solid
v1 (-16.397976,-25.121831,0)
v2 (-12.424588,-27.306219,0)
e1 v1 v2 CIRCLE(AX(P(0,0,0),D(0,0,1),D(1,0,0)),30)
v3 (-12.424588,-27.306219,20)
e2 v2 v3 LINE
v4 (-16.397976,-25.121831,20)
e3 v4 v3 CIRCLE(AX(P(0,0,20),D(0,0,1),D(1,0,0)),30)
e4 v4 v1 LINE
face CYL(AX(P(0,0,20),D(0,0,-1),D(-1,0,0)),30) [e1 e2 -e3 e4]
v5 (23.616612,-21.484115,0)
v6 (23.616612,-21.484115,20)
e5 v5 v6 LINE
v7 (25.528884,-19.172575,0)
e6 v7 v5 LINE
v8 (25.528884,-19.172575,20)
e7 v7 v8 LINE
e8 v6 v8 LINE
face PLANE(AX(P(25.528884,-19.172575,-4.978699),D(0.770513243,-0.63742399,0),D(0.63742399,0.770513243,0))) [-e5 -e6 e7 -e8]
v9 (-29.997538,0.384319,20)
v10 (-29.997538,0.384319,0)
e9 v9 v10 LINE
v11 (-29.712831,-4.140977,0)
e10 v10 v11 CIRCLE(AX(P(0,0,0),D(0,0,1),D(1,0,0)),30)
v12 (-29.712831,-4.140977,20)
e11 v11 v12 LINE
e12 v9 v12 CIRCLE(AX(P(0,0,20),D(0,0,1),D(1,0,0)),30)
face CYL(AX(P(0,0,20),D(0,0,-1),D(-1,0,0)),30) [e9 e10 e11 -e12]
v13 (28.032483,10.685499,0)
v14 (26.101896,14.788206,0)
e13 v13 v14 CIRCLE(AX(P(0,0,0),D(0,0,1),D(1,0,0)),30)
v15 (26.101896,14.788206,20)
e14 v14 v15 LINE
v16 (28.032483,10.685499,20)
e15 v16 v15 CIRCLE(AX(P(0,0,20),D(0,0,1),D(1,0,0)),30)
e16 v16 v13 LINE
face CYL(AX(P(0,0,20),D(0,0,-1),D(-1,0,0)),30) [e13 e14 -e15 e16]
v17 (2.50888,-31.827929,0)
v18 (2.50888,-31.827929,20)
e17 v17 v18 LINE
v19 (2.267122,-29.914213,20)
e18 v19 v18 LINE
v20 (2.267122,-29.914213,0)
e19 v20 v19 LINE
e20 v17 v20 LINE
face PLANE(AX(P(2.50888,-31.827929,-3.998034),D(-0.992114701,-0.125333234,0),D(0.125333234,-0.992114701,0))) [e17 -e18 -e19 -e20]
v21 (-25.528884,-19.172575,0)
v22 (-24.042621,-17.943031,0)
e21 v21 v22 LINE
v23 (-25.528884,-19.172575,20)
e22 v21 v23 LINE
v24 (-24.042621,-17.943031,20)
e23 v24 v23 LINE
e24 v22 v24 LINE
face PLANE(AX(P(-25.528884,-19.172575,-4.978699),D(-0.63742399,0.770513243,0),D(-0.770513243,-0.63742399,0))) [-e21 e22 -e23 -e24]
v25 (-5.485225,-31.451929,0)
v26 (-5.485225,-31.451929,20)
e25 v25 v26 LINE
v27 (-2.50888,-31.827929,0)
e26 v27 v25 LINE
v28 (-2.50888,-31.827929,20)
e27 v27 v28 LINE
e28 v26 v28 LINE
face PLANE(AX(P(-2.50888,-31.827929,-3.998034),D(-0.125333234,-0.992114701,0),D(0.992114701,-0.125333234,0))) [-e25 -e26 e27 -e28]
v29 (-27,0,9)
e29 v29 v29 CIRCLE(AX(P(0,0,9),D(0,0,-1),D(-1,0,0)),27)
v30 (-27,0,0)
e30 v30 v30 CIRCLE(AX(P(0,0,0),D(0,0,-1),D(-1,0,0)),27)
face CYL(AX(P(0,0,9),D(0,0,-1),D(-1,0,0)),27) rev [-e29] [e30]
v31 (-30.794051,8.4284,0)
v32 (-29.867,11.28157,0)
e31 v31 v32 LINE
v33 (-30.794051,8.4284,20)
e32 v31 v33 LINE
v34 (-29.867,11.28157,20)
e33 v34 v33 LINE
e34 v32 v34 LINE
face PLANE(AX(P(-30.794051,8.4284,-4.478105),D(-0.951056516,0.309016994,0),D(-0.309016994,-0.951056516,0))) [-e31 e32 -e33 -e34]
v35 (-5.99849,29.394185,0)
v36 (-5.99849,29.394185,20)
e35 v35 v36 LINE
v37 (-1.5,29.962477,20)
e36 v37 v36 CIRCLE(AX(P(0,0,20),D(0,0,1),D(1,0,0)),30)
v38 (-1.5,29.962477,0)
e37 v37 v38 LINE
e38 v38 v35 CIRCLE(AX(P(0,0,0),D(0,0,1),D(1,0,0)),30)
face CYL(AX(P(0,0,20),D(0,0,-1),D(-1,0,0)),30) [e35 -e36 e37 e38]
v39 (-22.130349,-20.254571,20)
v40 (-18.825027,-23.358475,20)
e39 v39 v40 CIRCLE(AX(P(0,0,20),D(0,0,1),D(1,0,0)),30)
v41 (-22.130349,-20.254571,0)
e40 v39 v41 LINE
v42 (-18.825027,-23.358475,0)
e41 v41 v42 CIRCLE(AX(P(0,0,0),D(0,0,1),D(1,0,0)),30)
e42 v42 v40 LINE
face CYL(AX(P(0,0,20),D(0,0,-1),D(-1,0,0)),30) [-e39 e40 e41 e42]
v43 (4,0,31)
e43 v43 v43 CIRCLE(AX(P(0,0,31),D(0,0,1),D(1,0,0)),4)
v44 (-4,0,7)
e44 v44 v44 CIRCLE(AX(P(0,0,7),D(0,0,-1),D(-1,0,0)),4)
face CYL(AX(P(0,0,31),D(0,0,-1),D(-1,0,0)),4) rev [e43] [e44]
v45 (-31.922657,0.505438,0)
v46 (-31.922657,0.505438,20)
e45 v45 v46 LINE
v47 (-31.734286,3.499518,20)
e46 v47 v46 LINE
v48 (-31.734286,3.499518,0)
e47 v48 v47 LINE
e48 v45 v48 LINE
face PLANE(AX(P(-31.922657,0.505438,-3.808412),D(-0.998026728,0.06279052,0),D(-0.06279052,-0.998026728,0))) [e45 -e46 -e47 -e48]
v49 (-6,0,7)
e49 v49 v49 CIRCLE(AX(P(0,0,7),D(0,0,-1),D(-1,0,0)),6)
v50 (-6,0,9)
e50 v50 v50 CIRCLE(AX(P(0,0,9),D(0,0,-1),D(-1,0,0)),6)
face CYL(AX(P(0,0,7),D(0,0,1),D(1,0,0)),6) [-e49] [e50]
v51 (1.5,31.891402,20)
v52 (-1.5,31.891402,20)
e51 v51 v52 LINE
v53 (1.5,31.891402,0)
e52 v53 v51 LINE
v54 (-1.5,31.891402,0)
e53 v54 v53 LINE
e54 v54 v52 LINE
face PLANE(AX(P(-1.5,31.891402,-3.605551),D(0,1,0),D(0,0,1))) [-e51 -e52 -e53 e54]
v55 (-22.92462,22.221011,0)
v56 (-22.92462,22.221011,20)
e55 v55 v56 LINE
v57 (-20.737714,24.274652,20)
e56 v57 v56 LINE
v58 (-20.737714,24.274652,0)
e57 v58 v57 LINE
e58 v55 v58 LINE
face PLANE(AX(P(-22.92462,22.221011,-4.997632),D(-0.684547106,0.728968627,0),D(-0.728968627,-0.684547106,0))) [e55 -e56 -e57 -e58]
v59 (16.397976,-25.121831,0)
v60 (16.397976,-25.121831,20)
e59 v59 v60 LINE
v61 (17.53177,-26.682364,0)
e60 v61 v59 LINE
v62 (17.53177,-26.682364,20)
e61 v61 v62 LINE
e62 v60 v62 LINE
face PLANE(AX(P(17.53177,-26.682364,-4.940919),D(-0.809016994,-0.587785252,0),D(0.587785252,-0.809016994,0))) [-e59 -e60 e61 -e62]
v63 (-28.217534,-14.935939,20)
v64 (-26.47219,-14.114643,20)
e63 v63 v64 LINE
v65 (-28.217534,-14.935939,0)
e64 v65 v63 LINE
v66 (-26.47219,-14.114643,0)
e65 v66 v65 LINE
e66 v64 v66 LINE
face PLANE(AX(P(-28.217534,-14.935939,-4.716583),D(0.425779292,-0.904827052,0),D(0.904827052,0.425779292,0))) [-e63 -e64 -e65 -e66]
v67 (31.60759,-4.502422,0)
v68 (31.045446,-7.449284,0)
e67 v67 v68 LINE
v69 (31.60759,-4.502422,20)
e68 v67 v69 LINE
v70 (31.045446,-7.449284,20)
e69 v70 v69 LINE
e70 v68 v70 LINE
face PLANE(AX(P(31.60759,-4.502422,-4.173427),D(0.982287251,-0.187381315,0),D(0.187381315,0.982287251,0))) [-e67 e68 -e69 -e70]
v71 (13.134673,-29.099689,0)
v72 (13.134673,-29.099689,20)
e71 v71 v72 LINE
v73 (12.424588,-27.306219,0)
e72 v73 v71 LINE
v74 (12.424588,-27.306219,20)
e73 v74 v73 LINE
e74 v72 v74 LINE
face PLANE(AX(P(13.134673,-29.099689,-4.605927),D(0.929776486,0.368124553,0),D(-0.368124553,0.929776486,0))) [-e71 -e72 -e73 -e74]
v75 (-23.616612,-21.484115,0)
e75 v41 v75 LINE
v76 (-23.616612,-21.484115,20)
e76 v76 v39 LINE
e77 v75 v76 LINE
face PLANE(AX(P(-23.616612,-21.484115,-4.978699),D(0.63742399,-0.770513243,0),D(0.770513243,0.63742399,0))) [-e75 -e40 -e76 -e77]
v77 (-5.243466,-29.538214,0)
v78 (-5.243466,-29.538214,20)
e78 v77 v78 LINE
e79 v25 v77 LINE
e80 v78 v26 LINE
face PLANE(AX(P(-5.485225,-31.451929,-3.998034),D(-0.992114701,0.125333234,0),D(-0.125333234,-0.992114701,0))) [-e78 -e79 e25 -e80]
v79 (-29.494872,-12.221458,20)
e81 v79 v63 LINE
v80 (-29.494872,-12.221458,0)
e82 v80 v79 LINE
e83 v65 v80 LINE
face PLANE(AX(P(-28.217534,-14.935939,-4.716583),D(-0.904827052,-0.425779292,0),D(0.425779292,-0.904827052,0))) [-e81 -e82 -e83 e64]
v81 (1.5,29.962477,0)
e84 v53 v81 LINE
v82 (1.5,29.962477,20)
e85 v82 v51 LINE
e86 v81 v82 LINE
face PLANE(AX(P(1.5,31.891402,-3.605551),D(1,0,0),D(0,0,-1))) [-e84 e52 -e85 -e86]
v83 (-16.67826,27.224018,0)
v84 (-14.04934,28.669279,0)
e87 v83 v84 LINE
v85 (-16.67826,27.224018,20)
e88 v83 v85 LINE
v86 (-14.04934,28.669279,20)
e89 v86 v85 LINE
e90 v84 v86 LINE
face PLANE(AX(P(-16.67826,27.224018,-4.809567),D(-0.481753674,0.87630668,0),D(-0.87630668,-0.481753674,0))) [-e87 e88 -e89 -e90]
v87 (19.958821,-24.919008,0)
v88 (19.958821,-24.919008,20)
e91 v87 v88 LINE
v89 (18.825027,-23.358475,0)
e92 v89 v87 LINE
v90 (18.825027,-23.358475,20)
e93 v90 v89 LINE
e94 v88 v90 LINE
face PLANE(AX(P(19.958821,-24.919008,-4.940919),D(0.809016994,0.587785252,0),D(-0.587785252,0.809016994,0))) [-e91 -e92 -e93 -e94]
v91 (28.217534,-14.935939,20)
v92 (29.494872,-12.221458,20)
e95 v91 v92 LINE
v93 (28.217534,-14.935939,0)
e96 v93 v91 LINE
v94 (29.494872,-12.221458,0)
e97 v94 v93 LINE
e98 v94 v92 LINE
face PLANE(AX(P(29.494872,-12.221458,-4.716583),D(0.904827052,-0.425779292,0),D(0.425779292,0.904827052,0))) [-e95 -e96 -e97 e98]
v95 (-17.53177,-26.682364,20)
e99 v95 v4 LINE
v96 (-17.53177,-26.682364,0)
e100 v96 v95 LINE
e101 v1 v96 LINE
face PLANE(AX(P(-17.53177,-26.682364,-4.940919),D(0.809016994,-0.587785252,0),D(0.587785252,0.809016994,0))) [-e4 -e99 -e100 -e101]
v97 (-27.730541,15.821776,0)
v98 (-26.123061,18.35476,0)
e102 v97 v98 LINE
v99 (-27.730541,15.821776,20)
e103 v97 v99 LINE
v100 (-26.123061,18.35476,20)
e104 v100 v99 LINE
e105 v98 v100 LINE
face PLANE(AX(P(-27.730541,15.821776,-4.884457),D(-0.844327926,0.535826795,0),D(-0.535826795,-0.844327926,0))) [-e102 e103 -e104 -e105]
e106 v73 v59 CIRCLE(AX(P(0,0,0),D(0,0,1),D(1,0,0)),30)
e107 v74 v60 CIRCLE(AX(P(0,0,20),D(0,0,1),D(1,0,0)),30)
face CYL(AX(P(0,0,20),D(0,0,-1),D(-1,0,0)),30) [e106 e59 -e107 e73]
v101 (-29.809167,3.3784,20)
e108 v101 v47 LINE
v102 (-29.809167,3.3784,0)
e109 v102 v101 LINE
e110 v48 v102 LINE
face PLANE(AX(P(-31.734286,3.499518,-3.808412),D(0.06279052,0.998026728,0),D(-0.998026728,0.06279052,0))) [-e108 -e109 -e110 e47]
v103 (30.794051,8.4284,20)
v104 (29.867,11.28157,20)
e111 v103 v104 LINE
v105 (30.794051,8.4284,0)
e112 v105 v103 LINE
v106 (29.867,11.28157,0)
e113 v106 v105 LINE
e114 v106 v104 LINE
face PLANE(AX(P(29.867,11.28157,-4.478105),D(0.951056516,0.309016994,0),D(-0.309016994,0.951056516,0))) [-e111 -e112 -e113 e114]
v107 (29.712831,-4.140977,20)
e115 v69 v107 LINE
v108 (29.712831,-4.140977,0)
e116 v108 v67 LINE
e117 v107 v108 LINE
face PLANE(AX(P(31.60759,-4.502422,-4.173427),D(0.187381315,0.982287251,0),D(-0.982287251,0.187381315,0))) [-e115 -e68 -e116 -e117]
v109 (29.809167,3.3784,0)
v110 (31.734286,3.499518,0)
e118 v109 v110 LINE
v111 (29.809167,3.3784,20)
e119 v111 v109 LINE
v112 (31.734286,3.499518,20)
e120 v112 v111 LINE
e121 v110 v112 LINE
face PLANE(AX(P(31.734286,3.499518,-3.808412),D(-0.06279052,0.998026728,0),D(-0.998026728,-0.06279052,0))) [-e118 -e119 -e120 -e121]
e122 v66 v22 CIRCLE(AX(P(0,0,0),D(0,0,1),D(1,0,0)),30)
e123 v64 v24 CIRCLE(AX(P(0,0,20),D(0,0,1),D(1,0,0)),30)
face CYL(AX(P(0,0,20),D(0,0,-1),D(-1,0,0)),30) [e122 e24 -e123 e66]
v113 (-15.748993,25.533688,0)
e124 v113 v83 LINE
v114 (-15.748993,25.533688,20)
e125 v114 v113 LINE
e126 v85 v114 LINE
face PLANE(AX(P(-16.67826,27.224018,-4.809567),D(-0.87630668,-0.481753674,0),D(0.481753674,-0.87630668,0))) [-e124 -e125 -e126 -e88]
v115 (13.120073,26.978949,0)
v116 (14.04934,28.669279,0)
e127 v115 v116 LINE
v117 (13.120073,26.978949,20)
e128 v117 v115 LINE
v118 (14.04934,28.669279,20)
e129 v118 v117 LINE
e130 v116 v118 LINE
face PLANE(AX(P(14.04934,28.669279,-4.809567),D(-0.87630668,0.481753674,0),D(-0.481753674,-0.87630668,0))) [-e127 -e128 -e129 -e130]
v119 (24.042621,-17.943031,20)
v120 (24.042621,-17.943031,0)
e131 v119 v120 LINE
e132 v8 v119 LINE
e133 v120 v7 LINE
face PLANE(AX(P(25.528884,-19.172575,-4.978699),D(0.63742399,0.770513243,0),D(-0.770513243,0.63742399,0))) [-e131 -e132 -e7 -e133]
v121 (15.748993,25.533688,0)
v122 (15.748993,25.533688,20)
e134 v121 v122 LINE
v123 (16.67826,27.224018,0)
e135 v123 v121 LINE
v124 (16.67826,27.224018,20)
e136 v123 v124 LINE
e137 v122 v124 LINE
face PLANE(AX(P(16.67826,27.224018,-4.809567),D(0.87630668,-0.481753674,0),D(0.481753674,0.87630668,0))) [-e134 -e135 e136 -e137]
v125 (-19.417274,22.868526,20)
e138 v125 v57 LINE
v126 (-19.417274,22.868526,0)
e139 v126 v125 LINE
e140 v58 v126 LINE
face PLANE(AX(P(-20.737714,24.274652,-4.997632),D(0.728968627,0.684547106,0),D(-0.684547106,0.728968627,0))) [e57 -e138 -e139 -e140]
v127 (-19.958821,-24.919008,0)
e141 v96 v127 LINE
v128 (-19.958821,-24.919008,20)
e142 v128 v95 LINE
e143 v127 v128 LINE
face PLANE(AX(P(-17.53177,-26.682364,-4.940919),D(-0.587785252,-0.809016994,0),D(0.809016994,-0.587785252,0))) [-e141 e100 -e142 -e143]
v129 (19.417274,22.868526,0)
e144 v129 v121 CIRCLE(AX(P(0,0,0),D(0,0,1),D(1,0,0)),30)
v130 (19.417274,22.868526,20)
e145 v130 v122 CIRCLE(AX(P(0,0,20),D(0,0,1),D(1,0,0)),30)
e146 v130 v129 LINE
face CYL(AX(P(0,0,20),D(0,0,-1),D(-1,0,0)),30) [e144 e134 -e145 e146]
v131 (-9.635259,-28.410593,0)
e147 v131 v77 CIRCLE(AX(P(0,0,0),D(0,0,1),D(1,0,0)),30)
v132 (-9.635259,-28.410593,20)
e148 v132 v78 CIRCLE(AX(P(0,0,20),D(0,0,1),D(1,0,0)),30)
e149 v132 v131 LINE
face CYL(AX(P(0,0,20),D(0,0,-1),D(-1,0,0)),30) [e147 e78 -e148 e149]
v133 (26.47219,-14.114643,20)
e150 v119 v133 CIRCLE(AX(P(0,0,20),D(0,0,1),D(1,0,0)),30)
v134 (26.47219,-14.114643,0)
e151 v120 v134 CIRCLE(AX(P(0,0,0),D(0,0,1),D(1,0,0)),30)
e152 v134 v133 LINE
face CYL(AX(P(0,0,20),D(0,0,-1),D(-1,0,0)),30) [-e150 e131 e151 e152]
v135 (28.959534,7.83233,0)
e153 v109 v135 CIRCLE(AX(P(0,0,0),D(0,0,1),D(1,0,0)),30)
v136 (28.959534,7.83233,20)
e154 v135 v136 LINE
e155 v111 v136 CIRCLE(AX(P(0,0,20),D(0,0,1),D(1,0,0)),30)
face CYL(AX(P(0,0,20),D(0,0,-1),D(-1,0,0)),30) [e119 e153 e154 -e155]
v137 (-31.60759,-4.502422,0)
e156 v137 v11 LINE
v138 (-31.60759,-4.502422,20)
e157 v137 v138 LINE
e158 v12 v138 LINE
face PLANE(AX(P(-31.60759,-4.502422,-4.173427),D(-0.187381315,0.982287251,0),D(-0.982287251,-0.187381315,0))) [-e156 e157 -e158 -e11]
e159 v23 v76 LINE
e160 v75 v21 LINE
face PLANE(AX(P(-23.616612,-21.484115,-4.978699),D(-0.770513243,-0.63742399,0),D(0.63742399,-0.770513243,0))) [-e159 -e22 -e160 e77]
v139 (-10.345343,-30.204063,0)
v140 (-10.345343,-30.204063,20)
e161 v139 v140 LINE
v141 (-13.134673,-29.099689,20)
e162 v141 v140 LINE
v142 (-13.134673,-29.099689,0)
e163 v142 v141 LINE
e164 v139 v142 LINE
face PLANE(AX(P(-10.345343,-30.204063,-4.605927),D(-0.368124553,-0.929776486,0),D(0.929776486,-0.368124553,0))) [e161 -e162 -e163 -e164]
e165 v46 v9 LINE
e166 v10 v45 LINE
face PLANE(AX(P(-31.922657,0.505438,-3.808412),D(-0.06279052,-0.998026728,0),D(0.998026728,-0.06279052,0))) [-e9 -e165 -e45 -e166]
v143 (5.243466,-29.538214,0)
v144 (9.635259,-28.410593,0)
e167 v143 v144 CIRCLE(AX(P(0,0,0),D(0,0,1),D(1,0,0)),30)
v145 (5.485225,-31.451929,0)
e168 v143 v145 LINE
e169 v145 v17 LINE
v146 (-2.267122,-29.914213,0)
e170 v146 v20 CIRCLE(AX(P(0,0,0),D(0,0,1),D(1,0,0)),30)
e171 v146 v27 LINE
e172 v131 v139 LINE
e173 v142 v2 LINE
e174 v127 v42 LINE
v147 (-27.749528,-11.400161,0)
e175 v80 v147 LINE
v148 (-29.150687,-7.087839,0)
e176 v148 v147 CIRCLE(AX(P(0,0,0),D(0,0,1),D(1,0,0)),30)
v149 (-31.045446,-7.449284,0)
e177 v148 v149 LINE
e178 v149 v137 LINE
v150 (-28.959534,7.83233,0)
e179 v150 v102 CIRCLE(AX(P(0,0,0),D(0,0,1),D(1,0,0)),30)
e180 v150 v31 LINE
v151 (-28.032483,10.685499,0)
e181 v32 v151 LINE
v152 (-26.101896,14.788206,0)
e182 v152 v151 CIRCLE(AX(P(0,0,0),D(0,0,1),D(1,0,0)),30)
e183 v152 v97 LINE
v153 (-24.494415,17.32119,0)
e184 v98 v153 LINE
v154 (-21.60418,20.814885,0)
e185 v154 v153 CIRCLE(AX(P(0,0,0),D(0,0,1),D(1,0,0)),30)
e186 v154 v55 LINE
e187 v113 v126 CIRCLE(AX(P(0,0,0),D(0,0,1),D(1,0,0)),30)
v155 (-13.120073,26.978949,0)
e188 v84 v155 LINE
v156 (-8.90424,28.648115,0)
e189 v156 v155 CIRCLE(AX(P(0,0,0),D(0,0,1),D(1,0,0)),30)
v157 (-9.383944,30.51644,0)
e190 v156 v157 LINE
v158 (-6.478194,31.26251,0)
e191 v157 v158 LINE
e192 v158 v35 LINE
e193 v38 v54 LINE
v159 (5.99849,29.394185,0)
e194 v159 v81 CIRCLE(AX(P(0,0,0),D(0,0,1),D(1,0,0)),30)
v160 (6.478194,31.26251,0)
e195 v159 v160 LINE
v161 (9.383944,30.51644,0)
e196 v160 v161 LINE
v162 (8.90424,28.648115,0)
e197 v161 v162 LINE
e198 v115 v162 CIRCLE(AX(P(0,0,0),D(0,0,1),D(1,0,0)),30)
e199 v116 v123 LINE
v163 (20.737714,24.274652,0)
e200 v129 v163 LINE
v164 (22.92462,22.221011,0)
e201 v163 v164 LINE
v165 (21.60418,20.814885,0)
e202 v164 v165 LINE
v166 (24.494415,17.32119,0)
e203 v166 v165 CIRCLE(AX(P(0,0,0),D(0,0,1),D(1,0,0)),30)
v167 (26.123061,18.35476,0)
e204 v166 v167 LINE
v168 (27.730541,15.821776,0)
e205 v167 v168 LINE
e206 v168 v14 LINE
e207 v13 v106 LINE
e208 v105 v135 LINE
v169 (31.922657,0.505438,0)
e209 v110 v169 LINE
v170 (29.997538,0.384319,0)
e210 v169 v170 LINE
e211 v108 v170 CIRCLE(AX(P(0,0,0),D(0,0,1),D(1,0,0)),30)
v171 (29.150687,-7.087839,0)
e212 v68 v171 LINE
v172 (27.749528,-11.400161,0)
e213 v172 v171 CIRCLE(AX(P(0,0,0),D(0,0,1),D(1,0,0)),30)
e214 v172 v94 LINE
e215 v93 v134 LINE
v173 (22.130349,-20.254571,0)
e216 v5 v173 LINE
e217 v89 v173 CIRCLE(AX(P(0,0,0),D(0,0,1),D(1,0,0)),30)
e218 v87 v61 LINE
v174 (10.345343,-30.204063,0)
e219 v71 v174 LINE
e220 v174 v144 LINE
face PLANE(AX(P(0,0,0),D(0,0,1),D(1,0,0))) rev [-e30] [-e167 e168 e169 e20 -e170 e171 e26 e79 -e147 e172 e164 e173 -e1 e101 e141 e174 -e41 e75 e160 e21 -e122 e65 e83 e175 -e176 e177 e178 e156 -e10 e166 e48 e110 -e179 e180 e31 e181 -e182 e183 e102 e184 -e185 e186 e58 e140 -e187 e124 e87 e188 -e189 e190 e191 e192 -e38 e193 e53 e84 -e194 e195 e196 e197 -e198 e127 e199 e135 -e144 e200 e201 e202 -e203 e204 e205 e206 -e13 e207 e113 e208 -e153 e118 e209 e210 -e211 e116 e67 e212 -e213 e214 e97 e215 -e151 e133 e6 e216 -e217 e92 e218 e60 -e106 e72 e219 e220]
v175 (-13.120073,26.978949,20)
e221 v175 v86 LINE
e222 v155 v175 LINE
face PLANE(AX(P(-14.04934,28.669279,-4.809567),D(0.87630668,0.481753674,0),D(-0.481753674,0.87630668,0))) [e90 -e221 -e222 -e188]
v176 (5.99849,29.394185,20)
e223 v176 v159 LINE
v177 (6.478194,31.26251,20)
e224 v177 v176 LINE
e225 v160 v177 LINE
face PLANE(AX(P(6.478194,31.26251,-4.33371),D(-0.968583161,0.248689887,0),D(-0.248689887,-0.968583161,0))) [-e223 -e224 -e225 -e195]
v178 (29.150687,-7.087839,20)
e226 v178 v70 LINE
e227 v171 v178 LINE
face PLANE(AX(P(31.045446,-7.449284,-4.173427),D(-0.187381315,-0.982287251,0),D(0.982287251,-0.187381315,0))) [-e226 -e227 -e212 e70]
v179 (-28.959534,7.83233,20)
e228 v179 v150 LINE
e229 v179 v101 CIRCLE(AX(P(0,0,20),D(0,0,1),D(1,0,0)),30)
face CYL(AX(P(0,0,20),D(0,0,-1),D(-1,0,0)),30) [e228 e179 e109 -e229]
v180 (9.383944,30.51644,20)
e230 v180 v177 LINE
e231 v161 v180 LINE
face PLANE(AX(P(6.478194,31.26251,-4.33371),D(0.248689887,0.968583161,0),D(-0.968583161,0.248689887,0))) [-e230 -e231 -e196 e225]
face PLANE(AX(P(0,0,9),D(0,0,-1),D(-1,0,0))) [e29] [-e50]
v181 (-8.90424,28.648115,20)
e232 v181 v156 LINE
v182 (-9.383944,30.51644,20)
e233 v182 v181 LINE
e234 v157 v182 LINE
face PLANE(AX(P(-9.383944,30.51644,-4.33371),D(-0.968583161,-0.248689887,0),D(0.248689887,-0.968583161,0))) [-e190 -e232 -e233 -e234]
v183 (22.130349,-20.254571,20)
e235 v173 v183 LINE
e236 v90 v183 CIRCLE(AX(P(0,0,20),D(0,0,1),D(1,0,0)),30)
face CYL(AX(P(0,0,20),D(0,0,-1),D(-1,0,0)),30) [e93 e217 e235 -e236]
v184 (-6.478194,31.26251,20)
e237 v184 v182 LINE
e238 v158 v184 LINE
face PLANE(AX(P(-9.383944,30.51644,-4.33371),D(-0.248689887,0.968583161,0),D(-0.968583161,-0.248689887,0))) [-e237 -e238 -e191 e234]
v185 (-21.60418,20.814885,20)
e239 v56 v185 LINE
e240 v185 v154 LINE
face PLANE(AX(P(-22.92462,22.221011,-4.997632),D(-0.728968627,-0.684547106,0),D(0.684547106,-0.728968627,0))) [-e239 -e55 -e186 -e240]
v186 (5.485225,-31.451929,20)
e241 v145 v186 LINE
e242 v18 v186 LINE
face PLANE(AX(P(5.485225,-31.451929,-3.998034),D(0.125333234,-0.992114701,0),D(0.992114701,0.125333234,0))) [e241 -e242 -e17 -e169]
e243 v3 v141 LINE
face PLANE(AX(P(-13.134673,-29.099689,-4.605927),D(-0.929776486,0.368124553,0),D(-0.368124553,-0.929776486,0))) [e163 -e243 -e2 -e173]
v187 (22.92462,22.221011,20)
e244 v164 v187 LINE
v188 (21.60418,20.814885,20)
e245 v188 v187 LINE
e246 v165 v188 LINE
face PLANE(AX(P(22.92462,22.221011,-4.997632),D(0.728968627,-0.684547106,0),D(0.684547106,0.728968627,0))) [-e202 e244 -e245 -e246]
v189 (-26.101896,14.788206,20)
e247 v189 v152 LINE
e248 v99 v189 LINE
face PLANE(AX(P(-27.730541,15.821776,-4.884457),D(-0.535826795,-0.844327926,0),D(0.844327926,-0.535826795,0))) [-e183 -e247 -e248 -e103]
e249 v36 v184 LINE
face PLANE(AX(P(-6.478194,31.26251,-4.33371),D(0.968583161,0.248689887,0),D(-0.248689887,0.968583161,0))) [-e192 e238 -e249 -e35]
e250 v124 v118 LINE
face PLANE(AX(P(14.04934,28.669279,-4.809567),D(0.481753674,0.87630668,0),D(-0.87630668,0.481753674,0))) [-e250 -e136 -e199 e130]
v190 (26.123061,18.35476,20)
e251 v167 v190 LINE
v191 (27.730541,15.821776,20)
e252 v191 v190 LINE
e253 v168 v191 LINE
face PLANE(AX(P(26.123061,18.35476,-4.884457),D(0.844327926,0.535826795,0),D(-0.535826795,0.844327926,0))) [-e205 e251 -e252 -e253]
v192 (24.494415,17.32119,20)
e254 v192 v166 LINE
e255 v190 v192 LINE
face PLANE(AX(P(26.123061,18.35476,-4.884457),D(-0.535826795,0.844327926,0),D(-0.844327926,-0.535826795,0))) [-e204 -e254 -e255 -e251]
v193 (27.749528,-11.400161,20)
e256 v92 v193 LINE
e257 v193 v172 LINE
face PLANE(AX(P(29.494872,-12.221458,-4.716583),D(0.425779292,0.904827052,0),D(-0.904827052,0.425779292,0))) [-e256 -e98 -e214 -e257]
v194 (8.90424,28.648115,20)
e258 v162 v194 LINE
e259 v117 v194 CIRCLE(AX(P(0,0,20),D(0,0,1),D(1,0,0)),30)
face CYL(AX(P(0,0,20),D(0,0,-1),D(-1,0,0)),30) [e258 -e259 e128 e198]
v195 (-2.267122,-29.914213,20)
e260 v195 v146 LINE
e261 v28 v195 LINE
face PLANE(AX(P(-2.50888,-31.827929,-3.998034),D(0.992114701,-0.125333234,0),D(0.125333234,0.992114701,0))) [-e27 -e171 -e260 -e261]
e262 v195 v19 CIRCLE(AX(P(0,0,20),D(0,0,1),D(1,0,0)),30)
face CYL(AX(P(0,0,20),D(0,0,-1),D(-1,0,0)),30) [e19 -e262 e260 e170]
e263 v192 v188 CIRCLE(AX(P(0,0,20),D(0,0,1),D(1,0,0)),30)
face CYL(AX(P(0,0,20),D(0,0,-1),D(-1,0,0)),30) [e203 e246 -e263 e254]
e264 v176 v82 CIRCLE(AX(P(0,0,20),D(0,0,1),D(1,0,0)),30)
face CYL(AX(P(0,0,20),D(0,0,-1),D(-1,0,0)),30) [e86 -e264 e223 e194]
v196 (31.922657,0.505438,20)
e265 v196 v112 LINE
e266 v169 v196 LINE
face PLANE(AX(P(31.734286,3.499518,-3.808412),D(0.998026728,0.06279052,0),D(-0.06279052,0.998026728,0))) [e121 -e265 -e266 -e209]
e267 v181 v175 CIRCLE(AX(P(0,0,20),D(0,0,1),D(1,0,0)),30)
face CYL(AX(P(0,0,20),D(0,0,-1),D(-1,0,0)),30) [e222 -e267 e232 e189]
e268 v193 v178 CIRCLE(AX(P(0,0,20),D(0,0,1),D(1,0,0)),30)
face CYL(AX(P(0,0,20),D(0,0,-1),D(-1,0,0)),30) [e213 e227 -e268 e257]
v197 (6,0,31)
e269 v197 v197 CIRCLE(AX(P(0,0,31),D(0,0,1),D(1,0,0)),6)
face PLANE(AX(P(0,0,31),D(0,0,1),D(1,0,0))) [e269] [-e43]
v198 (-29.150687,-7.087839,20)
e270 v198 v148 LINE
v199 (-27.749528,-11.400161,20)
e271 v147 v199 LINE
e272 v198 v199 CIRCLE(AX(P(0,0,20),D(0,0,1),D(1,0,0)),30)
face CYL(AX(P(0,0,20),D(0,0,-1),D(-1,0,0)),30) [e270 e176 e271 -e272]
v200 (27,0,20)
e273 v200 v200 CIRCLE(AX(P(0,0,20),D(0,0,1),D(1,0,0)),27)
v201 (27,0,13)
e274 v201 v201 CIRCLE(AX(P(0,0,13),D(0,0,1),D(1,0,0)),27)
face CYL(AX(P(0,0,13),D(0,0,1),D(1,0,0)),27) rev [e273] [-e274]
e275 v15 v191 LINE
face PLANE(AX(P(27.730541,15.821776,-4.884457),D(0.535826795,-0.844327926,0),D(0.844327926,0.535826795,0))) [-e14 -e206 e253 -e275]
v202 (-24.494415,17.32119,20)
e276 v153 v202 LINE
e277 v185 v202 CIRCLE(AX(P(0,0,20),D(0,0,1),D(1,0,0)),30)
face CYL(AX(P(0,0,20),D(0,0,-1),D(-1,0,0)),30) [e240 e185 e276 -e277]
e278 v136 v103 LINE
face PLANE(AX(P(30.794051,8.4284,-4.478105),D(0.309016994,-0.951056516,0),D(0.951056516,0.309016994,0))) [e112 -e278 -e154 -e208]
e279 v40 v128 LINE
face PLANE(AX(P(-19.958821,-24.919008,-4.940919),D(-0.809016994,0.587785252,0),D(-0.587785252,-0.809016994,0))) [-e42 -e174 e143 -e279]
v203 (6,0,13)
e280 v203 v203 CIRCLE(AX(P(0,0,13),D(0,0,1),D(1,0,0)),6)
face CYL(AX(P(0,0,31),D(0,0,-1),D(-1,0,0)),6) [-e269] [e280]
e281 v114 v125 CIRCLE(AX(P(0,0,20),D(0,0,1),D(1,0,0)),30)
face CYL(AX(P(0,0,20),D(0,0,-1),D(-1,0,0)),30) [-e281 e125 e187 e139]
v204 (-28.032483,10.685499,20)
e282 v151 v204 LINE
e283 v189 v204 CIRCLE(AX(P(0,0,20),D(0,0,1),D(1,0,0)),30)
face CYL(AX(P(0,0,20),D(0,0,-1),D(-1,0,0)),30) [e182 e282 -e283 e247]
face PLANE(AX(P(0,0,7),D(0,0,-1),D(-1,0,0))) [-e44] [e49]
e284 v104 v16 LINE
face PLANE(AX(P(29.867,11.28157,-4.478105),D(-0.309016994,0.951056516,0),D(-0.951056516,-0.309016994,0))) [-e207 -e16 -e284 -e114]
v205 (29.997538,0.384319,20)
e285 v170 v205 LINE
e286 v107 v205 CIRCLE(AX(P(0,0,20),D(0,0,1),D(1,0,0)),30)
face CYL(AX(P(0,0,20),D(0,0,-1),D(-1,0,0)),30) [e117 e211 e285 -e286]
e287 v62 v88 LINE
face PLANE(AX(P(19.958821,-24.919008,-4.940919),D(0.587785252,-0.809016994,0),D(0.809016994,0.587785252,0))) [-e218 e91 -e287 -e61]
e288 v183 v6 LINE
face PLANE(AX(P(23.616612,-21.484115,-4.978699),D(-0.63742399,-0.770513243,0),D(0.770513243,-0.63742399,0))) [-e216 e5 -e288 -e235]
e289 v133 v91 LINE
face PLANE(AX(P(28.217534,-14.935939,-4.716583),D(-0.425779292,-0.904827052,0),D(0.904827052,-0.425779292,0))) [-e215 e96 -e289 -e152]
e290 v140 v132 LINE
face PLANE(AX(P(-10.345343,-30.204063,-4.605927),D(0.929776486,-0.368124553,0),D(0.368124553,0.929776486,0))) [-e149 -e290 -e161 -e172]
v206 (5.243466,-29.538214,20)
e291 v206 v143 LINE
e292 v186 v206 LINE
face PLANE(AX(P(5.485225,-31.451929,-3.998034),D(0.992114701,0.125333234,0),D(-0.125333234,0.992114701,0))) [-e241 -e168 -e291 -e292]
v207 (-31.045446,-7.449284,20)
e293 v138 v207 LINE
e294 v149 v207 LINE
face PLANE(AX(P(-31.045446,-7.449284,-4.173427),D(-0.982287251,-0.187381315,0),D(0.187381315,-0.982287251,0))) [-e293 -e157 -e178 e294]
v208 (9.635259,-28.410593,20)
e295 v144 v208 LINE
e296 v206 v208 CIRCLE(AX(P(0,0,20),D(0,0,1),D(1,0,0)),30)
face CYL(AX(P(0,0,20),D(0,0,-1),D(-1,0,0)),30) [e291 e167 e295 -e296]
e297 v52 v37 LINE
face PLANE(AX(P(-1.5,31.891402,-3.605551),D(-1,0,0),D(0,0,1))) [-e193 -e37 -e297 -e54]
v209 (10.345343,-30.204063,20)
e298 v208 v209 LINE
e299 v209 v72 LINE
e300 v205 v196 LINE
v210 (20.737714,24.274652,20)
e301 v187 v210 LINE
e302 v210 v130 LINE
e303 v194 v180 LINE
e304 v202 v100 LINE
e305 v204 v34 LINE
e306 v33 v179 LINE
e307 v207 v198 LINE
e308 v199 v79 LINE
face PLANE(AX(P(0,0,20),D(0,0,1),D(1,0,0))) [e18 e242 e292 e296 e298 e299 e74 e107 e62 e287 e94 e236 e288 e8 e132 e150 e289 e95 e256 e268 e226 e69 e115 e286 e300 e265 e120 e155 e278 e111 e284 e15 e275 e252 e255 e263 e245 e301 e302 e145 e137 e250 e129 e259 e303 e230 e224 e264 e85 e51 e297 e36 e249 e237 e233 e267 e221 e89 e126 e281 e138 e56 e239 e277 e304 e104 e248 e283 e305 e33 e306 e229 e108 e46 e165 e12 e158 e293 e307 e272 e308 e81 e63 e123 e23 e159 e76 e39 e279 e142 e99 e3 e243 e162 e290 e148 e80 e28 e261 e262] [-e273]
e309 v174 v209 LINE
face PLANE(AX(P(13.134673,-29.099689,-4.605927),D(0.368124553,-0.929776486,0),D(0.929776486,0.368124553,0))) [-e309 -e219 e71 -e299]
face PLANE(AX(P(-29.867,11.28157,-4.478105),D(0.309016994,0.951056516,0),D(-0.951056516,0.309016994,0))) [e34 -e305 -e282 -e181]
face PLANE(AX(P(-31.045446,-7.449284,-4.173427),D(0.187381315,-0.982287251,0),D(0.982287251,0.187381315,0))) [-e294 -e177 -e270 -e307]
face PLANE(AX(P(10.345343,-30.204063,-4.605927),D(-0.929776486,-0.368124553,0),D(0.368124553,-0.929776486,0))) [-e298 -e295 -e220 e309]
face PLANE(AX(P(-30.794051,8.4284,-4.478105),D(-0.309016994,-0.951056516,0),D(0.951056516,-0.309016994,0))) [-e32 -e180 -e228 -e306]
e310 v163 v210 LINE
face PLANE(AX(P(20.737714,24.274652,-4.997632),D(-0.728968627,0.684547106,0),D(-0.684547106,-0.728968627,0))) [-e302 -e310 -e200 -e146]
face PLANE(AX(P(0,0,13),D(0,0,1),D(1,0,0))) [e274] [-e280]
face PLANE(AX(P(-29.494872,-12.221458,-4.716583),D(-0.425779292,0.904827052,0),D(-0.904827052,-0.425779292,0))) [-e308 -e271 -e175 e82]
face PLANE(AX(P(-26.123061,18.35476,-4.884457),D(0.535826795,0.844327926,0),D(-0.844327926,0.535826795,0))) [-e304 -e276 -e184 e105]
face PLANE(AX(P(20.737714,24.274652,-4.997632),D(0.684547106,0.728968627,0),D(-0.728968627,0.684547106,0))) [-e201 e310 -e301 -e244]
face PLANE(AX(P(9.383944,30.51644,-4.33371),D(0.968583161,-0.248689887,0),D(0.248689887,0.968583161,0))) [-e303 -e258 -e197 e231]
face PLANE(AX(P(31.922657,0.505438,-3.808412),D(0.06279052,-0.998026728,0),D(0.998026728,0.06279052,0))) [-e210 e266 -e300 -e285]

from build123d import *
from build123d.topology import SkipClean

# Parameters (mm, degrees)
SKETCH1_R           = 30
BOSS_EXTRUDE1_DEPTH = 20
SKETCH2_R           = 27
CUT_EXTRUDE1_DEPTH  = 7
CUT_EXTRUDE2_START  = -9
SKETCH3_R           = 27
CUT_EXTRUDE2_DEPTH  = 9
SKETCH4_R           = 6
SKETCH4_R_2         = 4
BOSS_EXTRUDE2_DEPTH = 18
BOSS_EXTRUDE3_START = 2
SKETCH5_R           = 6
BOSS_EXTRUDE3_DEPTH = 2
CUT_EXTRUDE7_START  = -42
SKETCH6_R           = 4
CUT_EXTRUDE7_DEPTH  = 42
SKETCH7_W           = 3
SKETCH7_H           = 2
BOSS_EXTRUDE4_DEPTH = 20
CIRPATTERN1_COUNT   = 25


with BuildPart() as part:
    # Sketch1 → Boss-Extrude1 (new body)
    with BuildSketch(Plane.XY):
        Circle(SKETCH1_R)
    extrude(amount=BOSS_EXTRUDE1_DEPTH)

    # Sketch2 → Cut-Extrude1 (cut)
    with BuildSketch(Plane.XY.offset(20)):
        Circle(SKETCH2_R)
    extrude(amount=-CUT_EXTRUDE1_DEPTH, mode=Mode.SUBTRACT)

    # Sketch3 → Cut-Extrude2 (cut)
    with BuildSketch(Plane(origin=(0, 0, 0), x_dir=(-1, 0, 0), z_dir=(0, 0, -1)).offset(CUT_EXTRUDE2_START)):
        with Locations(Location((0, 0, 0), (0, 0, 180))):
            Circle(SKETCH3_R)
    extrude(amount=CUT_EXTRUDE2_DEPTH, mode=Mode.SUBTRACT)

    # Sketch4 → Boss-Extrude2 (add)
    with BuildSketch(Plane.XY.offset(13)):
        Circle(SKETCH4_R)
        Circle(SKETCH4_R_2, mode=Mode.SUBTRACT)
    extrude(amount=BOSS_EXTRUDE2_DEPTH)

    # Sketch5 → Boss-Extrude3 (add)
    with BuildSketch(Plane(origin=(0, 0, 9), x_dir=(-1, 0, 0), z_dir=(0, 0, -1)).offset(BOSS_EXTRUDE3_START)):
        with Locations(Location((0, 0, 0), (0, 0, 180))):
            Circle(SKETCH5_R)
    extrude(amount=-BOSS_EXTRUDE3_DEPTH)

    # Sketch6 → Cut-Extrude7 (cut)
    with SkipClean():  # the faces are left unmerged after this step: merging them gives an invalid solid
        with BuildSketch(Plane.XY.offset(31).offset(CUT_EXTRUDE7_START)):
            with Locations(Location((0, 0, 0), (0, 0, 180))):
                Circle(SKETCH6_R)
        extrude(amount=CUT_EXTRUDE7_DEPTH, mode=Mode.SUBTRACT)
    add(part.part.scale(1), mode=Mode.REPLACE)  # the faces are merged on a copy

    # Sketch7 → Boss-Extrude4 (add)
    with BuildSketch(Plane.XY.offset(20)):
        with Locations((0, 30.891402014)):
            Rectangle(SKETCH7_W, SKETCH7_H)
    boss_extrude4 = extrude(amount=-BOSS_EXTRUDE4_DEPTH)

    # CirPattern1: Boss-Extrude4 ×25 about axis
    cirpattern1_axis = Axis((0, 0, 0), (0, 0, 1))
    for i in range(1, CIRPATTERN1_COUNT):
        add(boss_extrude4.rotate(cirpattern1_axis, i * 360 / CIRPATTERN1_COUNT))


solid = part.part
